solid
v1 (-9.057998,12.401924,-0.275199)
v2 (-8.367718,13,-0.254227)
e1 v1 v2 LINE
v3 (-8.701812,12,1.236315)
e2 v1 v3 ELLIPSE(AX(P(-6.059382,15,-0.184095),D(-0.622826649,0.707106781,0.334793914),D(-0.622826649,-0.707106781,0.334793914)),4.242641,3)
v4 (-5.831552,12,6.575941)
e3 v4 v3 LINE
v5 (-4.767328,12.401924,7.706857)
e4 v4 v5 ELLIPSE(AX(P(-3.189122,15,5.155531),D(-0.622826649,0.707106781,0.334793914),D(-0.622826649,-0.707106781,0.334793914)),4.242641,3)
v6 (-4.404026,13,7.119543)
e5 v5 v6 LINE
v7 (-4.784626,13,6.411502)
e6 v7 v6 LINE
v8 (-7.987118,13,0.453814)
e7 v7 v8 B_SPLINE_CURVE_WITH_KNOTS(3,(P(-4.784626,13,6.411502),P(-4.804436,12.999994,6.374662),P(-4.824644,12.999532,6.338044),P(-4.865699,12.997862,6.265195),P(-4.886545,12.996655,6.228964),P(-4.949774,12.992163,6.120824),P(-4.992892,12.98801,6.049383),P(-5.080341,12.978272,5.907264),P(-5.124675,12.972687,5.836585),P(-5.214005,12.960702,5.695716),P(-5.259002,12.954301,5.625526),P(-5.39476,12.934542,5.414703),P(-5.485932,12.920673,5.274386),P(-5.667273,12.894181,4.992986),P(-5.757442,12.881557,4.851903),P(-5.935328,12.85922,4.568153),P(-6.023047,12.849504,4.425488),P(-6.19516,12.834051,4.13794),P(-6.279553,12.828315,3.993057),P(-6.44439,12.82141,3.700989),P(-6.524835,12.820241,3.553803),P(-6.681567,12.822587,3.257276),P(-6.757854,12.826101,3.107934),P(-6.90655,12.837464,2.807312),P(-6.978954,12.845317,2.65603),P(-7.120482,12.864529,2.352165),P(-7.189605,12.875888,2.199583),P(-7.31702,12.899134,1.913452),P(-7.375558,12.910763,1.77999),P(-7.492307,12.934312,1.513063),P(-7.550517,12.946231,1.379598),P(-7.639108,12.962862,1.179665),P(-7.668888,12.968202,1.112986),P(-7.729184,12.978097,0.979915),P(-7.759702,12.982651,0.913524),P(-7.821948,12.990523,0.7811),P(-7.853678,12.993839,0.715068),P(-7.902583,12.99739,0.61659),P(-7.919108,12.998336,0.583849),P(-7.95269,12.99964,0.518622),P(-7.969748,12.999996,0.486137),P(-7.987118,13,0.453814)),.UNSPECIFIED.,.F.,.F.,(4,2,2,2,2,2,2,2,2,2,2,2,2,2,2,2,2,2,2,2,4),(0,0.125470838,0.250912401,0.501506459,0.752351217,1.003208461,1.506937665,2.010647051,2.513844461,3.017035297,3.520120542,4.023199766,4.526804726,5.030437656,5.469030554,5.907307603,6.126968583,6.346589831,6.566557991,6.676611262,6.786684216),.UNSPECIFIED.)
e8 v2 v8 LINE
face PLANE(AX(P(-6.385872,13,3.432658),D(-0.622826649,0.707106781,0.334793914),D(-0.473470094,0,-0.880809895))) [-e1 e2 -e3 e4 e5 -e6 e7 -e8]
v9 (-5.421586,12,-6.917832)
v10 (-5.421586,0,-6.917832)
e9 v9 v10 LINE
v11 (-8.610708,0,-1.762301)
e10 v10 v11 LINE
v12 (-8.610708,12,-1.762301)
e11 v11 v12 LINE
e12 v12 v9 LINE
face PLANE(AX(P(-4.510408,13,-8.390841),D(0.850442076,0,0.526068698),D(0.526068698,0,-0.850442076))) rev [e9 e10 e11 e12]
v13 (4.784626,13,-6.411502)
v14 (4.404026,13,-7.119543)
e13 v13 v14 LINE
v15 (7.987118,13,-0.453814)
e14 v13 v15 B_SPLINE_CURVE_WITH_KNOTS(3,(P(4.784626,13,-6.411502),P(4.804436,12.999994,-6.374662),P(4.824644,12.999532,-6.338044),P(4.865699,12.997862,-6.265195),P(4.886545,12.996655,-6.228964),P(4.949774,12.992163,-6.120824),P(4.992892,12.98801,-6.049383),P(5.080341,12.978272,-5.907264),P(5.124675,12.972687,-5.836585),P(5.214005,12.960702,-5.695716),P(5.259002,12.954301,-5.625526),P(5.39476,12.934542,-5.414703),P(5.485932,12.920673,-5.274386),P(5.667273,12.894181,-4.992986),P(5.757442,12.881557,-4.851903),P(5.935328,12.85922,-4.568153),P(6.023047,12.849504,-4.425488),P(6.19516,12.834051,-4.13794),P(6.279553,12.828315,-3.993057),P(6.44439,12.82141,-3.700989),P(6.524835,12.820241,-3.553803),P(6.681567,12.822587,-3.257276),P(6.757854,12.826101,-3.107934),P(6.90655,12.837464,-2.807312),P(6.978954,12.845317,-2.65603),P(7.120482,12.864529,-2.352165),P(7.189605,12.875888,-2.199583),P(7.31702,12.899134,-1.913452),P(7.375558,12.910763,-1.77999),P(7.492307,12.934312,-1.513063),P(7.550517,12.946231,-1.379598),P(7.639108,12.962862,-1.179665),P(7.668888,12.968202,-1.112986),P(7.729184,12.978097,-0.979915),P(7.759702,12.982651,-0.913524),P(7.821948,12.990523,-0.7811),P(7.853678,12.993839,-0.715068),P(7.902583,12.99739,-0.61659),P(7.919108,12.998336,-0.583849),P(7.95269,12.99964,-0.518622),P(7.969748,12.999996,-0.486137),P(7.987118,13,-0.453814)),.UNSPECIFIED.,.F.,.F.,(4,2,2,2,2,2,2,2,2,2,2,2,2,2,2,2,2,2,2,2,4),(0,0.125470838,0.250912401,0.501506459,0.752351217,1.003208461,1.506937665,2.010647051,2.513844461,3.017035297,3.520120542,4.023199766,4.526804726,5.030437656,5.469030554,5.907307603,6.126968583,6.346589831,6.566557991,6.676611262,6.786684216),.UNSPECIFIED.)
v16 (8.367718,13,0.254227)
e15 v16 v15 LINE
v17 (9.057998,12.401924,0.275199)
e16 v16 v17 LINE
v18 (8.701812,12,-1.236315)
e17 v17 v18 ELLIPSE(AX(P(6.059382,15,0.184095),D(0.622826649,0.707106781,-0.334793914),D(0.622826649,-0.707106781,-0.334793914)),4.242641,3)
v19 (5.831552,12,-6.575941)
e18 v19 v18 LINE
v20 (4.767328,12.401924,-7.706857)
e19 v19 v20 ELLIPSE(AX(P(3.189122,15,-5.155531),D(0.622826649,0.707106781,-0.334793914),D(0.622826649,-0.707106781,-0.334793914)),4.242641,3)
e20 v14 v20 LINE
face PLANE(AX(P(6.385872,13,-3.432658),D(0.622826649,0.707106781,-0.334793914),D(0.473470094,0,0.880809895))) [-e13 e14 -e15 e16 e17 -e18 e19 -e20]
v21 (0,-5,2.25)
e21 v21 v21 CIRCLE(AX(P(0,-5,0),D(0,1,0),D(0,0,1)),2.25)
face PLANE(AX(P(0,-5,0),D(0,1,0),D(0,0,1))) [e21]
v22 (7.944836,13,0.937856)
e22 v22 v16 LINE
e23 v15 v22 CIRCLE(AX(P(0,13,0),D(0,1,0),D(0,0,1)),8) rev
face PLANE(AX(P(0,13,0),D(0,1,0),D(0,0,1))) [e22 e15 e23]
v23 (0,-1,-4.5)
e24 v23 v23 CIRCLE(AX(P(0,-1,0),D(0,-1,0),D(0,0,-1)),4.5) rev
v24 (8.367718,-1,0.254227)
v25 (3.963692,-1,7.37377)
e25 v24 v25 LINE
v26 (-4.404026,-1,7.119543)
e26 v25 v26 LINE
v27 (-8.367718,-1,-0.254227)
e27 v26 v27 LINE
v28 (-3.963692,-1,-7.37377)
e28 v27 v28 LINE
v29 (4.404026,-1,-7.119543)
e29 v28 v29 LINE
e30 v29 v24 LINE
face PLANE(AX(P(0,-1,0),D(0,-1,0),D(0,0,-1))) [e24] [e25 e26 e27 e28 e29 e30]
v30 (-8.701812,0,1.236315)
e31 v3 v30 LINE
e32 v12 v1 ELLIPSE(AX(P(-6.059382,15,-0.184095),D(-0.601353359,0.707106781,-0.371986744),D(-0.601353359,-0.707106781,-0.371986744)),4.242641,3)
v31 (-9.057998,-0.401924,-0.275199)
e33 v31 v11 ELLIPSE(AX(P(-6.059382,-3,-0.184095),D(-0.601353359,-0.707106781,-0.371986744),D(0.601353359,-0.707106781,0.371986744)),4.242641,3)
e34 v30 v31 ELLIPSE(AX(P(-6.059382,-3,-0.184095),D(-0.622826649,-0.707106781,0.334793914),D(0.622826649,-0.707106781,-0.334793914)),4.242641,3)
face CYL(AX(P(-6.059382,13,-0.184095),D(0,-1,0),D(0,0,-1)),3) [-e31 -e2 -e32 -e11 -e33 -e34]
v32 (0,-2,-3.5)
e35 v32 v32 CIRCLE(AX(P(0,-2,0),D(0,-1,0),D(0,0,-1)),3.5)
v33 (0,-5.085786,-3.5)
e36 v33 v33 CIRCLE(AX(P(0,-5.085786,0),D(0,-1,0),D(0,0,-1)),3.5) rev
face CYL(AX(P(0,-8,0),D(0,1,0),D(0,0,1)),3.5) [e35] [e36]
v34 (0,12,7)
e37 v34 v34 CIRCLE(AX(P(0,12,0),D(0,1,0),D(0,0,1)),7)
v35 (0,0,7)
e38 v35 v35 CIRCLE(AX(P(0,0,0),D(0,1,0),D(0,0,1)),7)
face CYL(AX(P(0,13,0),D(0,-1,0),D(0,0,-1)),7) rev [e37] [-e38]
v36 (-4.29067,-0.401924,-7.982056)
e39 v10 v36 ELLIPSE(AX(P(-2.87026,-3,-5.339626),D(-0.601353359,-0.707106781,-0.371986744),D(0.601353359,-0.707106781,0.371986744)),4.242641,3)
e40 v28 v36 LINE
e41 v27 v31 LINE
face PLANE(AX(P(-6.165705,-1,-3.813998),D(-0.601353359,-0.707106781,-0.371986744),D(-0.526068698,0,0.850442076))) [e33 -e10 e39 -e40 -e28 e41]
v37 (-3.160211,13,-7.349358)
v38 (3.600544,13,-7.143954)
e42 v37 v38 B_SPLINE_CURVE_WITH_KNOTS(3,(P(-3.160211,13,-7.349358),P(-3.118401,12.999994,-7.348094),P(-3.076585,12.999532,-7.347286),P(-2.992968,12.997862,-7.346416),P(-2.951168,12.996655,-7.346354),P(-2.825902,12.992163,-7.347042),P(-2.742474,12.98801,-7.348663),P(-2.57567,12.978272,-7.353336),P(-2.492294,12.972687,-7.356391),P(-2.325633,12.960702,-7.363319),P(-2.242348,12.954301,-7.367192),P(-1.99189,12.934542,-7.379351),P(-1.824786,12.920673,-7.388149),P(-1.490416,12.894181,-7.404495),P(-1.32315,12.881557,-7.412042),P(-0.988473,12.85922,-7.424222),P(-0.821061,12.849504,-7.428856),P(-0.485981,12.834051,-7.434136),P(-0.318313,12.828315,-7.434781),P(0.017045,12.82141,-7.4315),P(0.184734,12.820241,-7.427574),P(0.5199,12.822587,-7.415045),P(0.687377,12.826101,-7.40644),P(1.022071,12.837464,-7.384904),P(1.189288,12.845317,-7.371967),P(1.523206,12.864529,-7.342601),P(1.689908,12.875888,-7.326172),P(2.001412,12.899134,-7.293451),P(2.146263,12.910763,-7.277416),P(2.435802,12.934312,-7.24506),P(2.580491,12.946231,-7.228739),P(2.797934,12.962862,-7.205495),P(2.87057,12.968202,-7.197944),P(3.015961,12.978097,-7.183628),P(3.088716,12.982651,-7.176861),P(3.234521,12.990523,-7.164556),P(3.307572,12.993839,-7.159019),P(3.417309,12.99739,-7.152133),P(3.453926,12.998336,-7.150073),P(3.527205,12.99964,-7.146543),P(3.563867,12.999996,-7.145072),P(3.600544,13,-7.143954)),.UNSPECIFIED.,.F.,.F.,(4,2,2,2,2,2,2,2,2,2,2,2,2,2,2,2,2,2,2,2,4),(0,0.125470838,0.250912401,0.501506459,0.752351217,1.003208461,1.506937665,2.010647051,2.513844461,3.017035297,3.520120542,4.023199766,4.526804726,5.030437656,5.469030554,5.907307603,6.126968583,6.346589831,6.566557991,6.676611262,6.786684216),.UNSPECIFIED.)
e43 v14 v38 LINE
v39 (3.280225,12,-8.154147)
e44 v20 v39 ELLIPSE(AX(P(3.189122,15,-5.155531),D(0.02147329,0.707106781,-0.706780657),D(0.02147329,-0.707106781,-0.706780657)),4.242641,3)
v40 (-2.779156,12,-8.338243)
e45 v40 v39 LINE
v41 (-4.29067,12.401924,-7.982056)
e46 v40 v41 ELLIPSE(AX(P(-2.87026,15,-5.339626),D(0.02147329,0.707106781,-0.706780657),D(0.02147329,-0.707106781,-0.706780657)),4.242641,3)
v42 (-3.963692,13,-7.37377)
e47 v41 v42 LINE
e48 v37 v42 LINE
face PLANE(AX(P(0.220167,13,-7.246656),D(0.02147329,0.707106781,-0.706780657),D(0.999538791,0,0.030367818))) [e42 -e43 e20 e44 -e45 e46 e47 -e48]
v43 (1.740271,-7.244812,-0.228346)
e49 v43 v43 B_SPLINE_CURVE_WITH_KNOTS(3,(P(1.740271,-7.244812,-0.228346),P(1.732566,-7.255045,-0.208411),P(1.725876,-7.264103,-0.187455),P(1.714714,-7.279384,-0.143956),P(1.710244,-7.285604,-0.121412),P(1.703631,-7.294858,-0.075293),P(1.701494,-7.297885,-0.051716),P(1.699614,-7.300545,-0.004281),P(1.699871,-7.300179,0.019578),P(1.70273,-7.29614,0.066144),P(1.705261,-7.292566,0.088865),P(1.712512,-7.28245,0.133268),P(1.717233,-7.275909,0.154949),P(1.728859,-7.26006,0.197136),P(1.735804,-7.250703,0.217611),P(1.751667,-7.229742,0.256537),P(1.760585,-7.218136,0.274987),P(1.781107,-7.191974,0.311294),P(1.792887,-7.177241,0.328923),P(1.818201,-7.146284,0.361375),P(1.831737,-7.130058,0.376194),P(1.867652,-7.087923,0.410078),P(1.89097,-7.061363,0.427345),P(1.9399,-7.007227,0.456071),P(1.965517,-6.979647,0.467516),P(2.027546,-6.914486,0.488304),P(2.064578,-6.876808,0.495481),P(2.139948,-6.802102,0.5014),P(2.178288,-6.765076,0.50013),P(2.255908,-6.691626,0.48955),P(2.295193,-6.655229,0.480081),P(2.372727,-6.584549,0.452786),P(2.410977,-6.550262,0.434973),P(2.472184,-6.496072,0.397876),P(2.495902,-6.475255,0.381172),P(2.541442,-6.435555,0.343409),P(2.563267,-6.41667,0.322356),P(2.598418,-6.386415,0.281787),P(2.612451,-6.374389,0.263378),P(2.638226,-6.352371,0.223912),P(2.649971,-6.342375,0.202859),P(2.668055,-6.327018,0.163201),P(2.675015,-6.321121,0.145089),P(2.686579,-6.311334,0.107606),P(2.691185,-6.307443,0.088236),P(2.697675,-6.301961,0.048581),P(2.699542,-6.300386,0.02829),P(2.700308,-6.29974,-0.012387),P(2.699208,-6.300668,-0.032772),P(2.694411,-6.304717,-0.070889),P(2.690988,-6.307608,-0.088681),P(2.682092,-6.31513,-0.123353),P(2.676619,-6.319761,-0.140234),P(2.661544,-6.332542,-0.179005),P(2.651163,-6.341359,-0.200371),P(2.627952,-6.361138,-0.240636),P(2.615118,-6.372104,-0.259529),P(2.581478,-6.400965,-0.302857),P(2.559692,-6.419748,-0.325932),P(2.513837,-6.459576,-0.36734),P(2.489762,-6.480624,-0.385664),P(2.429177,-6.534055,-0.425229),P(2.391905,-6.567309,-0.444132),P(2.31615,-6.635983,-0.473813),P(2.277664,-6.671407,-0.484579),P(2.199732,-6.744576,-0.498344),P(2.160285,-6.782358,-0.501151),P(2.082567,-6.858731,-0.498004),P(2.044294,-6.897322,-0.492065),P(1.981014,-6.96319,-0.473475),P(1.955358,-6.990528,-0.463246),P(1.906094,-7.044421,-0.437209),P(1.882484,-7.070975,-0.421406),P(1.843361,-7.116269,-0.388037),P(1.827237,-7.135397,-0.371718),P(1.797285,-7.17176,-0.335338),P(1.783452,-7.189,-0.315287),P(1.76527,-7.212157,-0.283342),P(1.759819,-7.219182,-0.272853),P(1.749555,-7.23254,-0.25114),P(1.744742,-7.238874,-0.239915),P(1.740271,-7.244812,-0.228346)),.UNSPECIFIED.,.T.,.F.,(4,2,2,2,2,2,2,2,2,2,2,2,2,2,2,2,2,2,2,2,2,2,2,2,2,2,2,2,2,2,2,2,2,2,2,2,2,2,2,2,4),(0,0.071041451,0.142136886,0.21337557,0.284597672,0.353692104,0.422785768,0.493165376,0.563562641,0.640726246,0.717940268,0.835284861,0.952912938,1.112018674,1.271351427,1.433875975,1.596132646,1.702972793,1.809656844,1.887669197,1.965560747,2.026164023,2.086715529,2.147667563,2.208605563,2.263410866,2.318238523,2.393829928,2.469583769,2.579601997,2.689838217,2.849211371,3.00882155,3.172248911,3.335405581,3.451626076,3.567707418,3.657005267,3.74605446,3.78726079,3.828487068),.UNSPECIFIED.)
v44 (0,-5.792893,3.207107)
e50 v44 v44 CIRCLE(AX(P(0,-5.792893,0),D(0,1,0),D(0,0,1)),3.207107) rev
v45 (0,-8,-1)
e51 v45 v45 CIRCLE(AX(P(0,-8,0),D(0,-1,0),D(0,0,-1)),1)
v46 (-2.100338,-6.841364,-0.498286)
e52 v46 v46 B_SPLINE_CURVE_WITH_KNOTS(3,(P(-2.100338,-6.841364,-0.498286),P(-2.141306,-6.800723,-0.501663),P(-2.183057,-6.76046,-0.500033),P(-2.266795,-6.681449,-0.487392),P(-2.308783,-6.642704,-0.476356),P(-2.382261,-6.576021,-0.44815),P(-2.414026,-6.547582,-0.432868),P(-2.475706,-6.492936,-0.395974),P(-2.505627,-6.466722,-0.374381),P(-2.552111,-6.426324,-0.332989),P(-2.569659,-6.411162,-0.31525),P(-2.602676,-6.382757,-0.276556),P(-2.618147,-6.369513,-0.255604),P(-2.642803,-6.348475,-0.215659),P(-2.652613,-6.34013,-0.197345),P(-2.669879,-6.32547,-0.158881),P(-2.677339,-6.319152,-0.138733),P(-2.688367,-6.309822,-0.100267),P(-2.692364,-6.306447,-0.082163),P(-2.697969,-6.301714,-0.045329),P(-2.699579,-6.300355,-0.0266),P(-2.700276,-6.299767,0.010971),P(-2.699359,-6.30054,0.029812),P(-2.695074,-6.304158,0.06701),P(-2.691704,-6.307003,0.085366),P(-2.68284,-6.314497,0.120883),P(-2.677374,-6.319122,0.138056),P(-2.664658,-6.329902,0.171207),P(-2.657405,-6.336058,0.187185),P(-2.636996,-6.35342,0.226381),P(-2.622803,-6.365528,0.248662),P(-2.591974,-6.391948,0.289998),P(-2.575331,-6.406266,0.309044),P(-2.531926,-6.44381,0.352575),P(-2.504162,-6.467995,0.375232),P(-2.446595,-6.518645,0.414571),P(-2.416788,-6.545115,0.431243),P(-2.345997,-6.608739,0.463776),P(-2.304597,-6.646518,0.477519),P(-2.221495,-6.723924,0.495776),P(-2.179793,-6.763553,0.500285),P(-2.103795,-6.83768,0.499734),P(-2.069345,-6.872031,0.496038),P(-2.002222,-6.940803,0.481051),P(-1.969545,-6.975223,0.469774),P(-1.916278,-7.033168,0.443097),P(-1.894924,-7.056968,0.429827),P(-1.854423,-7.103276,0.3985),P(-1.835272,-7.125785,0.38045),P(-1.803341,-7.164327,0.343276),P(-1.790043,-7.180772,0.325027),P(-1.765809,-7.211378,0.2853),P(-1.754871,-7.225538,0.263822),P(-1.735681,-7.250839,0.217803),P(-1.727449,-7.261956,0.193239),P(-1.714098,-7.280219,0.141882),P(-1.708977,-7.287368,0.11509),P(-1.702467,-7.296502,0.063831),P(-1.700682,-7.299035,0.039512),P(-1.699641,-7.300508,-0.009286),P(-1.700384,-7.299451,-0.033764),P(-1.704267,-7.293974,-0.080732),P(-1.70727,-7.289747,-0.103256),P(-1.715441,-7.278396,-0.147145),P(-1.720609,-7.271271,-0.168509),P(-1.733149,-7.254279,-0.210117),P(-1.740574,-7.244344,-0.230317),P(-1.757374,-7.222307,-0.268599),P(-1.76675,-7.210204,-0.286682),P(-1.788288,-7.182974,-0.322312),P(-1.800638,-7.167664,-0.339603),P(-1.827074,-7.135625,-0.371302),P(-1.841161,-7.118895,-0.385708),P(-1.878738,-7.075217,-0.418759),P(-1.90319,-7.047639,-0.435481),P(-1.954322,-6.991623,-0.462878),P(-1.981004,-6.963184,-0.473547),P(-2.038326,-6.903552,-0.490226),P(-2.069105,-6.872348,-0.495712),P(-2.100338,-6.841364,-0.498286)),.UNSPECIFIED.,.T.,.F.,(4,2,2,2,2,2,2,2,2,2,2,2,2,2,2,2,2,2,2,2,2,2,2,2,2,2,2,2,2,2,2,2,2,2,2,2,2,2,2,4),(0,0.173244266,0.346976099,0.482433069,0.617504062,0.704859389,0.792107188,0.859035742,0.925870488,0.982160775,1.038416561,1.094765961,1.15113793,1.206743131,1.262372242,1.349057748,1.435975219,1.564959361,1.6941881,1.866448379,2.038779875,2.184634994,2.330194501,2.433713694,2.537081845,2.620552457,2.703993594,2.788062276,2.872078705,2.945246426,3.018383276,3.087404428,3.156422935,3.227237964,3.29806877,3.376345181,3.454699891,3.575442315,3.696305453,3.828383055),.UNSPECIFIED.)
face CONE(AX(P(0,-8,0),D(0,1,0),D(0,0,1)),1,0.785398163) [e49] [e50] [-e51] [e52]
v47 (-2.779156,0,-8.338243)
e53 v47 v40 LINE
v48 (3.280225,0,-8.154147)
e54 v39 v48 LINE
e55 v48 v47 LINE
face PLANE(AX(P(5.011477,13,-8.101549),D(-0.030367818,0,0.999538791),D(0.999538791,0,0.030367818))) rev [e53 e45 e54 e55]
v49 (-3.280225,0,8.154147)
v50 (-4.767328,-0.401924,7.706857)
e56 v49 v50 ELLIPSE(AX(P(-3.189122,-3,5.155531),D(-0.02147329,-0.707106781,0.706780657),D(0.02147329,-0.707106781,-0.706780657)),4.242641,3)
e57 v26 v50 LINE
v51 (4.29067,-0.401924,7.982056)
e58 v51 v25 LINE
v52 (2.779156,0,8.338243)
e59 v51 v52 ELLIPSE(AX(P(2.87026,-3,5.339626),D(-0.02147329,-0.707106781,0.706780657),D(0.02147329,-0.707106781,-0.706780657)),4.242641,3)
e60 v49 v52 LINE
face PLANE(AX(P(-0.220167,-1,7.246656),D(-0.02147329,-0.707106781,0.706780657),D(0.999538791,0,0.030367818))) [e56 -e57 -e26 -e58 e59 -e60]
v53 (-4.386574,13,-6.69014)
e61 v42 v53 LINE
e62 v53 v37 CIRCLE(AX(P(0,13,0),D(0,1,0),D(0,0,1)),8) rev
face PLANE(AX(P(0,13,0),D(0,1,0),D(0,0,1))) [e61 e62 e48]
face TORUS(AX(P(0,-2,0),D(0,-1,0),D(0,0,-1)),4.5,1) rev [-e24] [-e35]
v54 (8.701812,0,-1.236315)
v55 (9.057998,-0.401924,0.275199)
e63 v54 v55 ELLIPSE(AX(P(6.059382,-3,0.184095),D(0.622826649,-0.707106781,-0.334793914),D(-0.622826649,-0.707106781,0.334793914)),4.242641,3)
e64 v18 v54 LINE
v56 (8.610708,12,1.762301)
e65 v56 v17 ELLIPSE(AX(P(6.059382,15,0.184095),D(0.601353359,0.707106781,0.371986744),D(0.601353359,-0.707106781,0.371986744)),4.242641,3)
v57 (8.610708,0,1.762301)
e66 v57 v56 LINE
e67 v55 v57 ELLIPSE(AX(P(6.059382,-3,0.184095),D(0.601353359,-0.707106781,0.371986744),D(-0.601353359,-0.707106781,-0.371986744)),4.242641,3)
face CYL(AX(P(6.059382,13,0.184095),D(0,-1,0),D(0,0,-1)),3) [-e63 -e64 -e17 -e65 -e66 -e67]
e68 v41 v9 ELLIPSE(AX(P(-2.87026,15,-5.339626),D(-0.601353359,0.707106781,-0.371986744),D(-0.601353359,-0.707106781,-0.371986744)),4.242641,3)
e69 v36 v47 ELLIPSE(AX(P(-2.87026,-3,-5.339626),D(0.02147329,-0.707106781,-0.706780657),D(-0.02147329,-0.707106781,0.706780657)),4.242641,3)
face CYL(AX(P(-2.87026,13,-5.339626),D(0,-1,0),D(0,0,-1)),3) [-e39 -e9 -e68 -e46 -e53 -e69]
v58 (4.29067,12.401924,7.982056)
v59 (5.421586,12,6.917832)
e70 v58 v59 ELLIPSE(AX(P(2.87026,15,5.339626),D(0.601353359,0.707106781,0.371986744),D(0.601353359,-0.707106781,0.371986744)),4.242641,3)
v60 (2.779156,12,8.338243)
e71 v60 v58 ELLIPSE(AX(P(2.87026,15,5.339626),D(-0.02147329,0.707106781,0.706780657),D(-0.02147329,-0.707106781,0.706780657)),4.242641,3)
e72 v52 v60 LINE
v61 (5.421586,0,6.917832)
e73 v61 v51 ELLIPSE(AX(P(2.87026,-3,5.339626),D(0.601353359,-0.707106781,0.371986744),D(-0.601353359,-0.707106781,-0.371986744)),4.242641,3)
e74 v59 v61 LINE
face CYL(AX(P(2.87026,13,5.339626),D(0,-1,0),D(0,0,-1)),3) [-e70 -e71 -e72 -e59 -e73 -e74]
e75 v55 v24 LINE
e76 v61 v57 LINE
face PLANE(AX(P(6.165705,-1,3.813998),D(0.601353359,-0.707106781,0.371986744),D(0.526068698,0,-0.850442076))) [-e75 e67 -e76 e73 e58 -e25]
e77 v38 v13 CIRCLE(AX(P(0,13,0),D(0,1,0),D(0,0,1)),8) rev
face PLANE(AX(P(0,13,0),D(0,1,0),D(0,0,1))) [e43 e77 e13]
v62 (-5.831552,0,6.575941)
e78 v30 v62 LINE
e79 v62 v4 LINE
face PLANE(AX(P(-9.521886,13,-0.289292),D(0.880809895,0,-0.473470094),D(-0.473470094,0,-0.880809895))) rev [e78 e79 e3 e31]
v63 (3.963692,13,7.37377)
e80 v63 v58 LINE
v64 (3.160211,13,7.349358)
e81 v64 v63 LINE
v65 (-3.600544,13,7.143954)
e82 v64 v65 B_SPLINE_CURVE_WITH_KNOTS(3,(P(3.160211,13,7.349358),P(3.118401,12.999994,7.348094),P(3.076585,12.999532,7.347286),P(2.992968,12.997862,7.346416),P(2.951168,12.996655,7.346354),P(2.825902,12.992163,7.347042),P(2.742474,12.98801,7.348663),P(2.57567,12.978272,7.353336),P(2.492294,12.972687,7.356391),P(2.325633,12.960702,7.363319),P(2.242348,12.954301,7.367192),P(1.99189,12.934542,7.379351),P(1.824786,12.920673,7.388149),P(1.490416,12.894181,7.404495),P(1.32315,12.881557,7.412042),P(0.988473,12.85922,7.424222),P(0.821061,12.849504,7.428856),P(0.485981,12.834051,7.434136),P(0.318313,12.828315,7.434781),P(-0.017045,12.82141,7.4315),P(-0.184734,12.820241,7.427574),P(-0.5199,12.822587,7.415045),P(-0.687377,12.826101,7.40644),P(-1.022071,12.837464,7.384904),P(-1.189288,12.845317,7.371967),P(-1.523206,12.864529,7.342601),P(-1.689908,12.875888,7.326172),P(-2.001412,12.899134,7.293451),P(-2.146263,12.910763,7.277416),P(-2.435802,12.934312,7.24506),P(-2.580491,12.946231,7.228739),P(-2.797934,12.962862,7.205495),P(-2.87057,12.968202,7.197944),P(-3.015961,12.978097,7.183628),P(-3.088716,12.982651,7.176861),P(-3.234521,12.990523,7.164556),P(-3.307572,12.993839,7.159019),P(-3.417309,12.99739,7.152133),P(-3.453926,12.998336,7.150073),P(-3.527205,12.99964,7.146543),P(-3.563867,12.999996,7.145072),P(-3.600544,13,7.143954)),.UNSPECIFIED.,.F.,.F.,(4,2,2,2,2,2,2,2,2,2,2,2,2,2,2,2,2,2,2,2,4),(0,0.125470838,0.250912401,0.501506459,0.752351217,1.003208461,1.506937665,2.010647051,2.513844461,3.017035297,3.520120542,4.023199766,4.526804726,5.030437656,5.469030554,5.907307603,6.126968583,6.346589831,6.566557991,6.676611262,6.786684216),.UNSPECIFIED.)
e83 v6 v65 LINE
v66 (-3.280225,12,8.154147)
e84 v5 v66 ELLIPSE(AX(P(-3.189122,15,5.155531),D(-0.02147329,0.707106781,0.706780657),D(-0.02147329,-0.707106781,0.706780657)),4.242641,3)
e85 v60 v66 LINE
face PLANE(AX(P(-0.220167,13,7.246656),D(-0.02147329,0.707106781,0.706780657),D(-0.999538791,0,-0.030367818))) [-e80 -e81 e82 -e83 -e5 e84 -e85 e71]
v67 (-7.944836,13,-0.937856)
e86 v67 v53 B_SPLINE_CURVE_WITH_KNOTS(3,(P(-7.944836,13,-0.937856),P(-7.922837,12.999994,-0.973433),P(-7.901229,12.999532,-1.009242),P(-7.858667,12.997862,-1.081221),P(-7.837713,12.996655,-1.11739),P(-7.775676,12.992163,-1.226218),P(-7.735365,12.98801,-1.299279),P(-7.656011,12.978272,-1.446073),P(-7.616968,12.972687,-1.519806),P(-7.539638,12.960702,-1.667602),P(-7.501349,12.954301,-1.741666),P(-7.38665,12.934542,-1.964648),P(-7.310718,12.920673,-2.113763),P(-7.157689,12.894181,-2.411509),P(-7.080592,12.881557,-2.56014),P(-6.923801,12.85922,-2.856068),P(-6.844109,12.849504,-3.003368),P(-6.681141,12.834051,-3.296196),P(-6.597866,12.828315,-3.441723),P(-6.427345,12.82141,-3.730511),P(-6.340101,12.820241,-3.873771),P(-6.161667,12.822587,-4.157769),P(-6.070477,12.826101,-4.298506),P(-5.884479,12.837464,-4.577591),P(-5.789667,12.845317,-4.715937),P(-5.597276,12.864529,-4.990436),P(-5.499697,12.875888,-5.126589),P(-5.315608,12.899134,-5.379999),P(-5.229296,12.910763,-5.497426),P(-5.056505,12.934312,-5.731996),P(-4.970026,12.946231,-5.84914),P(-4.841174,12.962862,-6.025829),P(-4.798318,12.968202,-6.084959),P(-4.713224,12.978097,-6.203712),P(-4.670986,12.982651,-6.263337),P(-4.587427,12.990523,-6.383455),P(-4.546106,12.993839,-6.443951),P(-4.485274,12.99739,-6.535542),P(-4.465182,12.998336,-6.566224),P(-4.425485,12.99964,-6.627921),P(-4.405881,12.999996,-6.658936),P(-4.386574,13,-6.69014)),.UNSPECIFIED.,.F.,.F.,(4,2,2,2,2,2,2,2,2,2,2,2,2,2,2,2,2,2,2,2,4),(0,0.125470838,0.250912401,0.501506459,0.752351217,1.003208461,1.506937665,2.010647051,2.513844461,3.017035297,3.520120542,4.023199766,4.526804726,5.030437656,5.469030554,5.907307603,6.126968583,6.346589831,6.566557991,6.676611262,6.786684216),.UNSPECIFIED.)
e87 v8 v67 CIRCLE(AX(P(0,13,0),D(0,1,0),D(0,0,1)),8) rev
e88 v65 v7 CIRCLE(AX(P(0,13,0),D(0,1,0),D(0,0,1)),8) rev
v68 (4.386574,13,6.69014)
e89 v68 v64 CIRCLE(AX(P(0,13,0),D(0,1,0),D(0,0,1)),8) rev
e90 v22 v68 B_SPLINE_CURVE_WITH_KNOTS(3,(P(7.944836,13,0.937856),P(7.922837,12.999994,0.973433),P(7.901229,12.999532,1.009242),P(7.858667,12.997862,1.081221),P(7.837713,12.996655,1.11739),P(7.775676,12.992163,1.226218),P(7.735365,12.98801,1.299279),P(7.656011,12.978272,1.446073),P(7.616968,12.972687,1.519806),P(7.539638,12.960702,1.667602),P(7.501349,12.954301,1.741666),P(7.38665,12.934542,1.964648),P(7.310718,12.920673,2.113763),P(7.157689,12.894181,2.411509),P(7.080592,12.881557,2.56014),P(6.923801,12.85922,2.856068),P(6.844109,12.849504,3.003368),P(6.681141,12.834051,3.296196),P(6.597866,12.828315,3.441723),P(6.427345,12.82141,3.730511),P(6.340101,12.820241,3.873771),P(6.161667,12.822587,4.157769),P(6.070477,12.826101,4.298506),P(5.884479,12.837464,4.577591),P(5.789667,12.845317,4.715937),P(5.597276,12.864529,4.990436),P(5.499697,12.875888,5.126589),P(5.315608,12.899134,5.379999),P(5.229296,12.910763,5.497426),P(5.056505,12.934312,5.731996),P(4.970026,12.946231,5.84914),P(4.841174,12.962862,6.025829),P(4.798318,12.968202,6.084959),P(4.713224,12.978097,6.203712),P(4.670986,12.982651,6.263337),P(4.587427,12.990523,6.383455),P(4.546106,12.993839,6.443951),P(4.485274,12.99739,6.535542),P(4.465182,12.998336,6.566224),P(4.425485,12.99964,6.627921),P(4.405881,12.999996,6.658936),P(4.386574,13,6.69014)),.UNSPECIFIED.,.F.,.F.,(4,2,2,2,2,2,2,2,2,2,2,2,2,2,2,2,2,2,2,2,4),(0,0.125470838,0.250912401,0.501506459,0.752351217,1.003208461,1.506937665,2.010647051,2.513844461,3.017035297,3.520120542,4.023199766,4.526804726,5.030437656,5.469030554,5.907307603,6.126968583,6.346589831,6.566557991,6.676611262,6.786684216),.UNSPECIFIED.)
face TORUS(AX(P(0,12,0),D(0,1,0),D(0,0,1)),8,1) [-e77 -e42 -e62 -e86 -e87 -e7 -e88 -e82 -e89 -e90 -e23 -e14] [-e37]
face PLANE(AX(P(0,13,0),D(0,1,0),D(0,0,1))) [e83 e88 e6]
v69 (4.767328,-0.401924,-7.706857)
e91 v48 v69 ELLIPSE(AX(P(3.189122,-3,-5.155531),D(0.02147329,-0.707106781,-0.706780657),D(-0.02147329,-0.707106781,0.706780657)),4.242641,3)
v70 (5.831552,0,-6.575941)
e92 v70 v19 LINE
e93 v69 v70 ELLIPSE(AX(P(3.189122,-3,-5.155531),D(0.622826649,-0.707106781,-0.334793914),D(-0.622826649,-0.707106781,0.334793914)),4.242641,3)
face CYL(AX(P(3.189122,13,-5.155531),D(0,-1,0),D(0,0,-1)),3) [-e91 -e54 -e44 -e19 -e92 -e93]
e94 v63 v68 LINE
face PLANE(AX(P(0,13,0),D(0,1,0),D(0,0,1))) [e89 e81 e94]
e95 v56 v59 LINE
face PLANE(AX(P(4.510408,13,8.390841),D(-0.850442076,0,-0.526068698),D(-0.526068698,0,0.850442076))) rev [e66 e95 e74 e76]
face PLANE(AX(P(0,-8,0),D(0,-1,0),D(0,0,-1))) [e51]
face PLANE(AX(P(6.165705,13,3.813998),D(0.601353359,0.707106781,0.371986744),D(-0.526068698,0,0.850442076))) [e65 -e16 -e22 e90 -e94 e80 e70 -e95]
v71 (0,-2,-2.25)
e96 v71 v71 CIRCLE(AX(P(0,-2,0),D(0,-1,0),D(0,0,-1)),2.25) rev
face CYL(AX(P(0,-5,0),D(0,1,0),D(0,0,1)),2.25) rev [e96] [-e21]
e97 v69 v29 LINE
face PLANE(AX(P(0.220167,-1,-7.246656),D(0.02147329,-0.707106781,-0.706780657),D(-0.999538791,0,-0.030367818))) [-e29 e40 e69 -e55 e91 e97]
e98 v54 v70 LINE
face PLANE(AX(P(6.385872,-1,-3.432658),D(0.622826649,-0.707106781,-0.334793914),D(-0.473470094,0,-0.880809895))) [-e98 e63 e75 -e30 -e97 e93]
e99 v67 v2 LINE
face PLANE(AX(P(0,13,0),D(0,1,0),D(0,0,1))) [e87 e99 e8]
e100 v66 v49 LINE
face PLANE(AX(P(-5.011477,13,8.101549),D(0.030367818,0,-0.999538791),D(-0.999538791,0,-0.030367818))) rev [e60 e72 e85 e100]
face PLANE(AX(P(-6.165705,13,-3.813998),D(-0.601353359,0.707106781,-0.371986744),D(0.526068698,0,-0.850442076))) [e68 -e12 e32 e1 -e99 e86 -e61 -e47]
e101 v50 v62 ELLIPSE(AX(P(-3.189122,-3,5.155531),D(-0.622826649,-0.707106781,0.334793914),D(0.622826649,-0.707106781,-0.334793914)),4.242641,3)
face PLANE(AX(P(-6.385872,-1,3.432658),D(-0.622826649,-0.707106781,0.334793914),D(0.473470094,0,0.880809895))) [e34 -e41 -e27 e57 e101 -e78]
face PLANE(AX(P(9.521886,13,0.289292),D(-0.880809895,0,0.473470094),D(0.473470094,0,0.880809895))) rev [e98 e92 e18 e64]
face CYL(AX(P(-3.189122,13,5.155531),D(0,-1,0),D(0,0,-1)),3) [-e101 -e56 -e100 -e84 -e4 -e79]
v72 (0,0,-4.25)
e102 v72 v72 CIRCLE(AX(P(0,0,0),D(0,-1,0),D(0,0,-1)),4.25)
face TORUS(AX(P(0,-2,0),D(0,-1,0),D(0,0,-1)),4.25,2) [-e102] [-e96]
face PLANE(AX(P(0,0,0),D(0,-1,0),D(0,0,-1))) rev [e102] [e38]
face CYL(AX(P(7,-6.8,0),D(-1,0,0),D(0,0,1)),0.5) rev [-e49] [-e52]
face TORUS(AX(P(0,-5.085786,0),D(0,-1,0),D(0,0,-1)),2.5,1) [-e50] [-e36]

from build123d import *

# Parameters (mm, degrees)
ESQUISSE1_R                  = 0.7
BOSS_EXTRU_1_DEPTH           = 1.3
BOSS_EXTRU_2_DEPTH           = 0.1
CHANFREIN1_SIZE              = 0.1
CONG_1_R                     = 0.3
ESQUISSE3_R                  = 0.35
BOSS_EXTRU_3_DEPTH           = 0.7
CHANFREIN2_SIZE              = 0.25
CONG_2_R                     = 0.1
CONG_3_R                     = 0.1
ENL_V_MAT_EXTRU_1_DEPTH      = 0.7
ENL_V_MAT_EXTRU_1_DEPTH_BACK = 0.7
ESQUISSE4_R                  = 0.05
CONG_4_R                     = 0.1
ESQUISSE5_R                  = 0.225
ENL_V_MAT_EXTRU_2_DEPTH      = 0.5
CONG_5_R                     = 0.2
ECHELLE1_SCALE               = 10


with BuildPart() as part:
    # Esquisse1 → Boss.-Extru.1 (new body)
    with BuildSketch(Plane(origin=(0, 0, 0), x_dir=(1, 0, 0), z_dir=(0, 1, 0))):
        Polygon((0.501147742, 0.810154887), (-0.451040842, 0.839084119), (-0.952188584, 0.028929232), (-0.501147742, -0.810154887), (0.451040842, -0.839084119), (0.952188584, -0.028929232), align=None)
        with Locations(Location((0, 0, 0), (0, 0, 270))):
            Circle(ESQUISSE1_R, mode=Mode.SUBTRACT)
    extrude(amount=BOSS_EXTRU_1_DEPTH)

    # Esquisse2 → Boss.-Extru.2 (add)
    with BuildSketch(Plane.XZ):
        Polygon((0.501147742, -0.810154887), (0.952188584, 0.028929232), (0.451040842, 0.839084119), (-0.501147742, 0.810154887), (-0.952188584, -0.028929232), (-0.451040842, -0.839084119), align=None)
    extrude(amount=BOSS_EXTRU_2_DEPTH)

    # Chanfrein1
    chanfrein1_edges = [part.edges().sort_by_distance(p)[0] for p in [
        (-0.701614713, 1.3, -0.434006676),
        (-0.726668163, 1.3, 0.390612827),
        (-0.02505345, 1.3, 0.824619503),
        (0.701614713, 1.3, 0.434006676),
        (0.02505345, -0.1, -0.824619503),
        (0.726668163, -0.1, -0.390612827),
        (0.701614713, -0.1, 0.434006676),
        (-0.02505345, -0.1, 0.824619503),
        (-0.726668163, -0.1, 0.390612827),
        (-0.701614713, -0.1, -0.434006676),
        (0.726668163, 1.3, -0.390612827),
        (0.02505345, 1.3, -0.824619503),
    ]]
    chamfer(chanfrein1_edges, length=CHANFREIN1_SIZE)

    # Congé1
    cong_1_edges = [part.edges().sort_by_distance(p)[0] for p in [
        (0.501147742, 0.6, -0.810154887),
        (-0.451040842, 0.6, -0.839084119),
        (0.952188584, 0.6, 0.028929232),
        (0.451040842, 0.6, 0.839084119),
        (-0.501147742, 0.6, 0.810154887),
        (-0.952188584, 0.6, -0.028929232),
    ]]
    fillet(cong_1_edges, radius=CONG_1_R)

    # Esquisse3 → Boss.-Extru.3 (add)
    with BuildSketch(Plane(origin=(0, -0.1, 0), x_dir=(-1, 0, 0), z_dir=(0, -1, 0))):
        with Locations(Location((0, 0, 0), (0, 0, 90))):
            Circle(ESQUISSE3_R)
    extrude(amount=BOSS_EXTRU_3_DEPTH)

    # Chanfrein2
    chanfrein2_edges = [part.edges().sort_by_distance(p)[0] for p in [
        (0, -0.8, 0.35),
    ]]
    chamfer(chanfrein2_edges, length=CHANFREIN2_SIZE)

    # Congé2
    # the kernel refuses this fillet: 0.1 mm, written as the material it takes off along each edge
    with BuildSketch(Plane(origin=(0, 1.3, 0), x_dir=(0, 0, 1), z_dir=(-1, 0, 0))) as cong_2_piece_1:
        with BuildLine():
            CenterArc((0.7 + CONG_2_R, -CONG_2_R), CONG_2_R, 90, 90)
            Line((0.7, -CONG_2_R), (0.7, 0))
            Line((0.7, 0), (0.7 + CONG_2_R, 0))
        make_face()
    revolve(axis=Axis((0, 1.3, 0), (0, 1, 0)), mode=Mode.SUBTRACT)

    # Congé3
    cong_3_edges = [part.edges().sort_by_distance(p)[0] for p in [
        (0, -0.1, 0.35),
    ]]
    fillet(cong_3_edges, radius=CONG_3_R)

    # Esquisse4 → Enlèv. mat.-Extru.1 (cut, two sides: drawn at the far end of the back side and taken through both)
    with BuildSketch(Plane(origin=(0, 0, 0), x_dir=(0, 0, -1), z_dir=(1, 0, 0)).offset(-ENL_V_MAT_EXTRU_1_DEPTH_BACK)):
        with Locations(Location((0, -0.68, 0), (0, 0, 297.173904779))):
            Circle(ESQUISSE4_R)
    extrude(amount=ENL_V_MAT_EXTRU_1_DEPTH + ENL_V_MAT_EXTRU_1_DEPTH_BACK, mode=Mode.SUBTRACT)

    # Congé4
    cong_4_edges = [part.edges().sort_by_distance(p)[0] for p in [
        (0, -0.55, 0.35),
    ]]
    fillet(cong_4_edges, radius=CONG_4_R)

    # Esquisse5 → Enlèv. mat.-Extru.2 (cut)
    with BuildSketch(Plane(origin=(0, 0, 0), x_dir=(1, 0, 0), z_dir=(0, 1, 0))):
        with Locations(Location((0, 0, 0), (0, 0, 270))):
            Circle(ESQUISSE5_R)
    extrude(amount=-ENL_V_MAT_EXTRU_2_DEPTH, mode=Mode.SUBTRACT)

    # Congé5
    cong_5_edges = [part.edges().sort_by_distance(p)[0] for p in [
        (0, 0, -0.225),
    ]]
    fillet(cong_5_edges, radius=CONG_5_R)


with BuildPart() as part_1:
    # Echelle1: scaled about (0, 0, 0)
    add(part.part.scale(ECHELLE1_SCALE))


solid = part_1.part
